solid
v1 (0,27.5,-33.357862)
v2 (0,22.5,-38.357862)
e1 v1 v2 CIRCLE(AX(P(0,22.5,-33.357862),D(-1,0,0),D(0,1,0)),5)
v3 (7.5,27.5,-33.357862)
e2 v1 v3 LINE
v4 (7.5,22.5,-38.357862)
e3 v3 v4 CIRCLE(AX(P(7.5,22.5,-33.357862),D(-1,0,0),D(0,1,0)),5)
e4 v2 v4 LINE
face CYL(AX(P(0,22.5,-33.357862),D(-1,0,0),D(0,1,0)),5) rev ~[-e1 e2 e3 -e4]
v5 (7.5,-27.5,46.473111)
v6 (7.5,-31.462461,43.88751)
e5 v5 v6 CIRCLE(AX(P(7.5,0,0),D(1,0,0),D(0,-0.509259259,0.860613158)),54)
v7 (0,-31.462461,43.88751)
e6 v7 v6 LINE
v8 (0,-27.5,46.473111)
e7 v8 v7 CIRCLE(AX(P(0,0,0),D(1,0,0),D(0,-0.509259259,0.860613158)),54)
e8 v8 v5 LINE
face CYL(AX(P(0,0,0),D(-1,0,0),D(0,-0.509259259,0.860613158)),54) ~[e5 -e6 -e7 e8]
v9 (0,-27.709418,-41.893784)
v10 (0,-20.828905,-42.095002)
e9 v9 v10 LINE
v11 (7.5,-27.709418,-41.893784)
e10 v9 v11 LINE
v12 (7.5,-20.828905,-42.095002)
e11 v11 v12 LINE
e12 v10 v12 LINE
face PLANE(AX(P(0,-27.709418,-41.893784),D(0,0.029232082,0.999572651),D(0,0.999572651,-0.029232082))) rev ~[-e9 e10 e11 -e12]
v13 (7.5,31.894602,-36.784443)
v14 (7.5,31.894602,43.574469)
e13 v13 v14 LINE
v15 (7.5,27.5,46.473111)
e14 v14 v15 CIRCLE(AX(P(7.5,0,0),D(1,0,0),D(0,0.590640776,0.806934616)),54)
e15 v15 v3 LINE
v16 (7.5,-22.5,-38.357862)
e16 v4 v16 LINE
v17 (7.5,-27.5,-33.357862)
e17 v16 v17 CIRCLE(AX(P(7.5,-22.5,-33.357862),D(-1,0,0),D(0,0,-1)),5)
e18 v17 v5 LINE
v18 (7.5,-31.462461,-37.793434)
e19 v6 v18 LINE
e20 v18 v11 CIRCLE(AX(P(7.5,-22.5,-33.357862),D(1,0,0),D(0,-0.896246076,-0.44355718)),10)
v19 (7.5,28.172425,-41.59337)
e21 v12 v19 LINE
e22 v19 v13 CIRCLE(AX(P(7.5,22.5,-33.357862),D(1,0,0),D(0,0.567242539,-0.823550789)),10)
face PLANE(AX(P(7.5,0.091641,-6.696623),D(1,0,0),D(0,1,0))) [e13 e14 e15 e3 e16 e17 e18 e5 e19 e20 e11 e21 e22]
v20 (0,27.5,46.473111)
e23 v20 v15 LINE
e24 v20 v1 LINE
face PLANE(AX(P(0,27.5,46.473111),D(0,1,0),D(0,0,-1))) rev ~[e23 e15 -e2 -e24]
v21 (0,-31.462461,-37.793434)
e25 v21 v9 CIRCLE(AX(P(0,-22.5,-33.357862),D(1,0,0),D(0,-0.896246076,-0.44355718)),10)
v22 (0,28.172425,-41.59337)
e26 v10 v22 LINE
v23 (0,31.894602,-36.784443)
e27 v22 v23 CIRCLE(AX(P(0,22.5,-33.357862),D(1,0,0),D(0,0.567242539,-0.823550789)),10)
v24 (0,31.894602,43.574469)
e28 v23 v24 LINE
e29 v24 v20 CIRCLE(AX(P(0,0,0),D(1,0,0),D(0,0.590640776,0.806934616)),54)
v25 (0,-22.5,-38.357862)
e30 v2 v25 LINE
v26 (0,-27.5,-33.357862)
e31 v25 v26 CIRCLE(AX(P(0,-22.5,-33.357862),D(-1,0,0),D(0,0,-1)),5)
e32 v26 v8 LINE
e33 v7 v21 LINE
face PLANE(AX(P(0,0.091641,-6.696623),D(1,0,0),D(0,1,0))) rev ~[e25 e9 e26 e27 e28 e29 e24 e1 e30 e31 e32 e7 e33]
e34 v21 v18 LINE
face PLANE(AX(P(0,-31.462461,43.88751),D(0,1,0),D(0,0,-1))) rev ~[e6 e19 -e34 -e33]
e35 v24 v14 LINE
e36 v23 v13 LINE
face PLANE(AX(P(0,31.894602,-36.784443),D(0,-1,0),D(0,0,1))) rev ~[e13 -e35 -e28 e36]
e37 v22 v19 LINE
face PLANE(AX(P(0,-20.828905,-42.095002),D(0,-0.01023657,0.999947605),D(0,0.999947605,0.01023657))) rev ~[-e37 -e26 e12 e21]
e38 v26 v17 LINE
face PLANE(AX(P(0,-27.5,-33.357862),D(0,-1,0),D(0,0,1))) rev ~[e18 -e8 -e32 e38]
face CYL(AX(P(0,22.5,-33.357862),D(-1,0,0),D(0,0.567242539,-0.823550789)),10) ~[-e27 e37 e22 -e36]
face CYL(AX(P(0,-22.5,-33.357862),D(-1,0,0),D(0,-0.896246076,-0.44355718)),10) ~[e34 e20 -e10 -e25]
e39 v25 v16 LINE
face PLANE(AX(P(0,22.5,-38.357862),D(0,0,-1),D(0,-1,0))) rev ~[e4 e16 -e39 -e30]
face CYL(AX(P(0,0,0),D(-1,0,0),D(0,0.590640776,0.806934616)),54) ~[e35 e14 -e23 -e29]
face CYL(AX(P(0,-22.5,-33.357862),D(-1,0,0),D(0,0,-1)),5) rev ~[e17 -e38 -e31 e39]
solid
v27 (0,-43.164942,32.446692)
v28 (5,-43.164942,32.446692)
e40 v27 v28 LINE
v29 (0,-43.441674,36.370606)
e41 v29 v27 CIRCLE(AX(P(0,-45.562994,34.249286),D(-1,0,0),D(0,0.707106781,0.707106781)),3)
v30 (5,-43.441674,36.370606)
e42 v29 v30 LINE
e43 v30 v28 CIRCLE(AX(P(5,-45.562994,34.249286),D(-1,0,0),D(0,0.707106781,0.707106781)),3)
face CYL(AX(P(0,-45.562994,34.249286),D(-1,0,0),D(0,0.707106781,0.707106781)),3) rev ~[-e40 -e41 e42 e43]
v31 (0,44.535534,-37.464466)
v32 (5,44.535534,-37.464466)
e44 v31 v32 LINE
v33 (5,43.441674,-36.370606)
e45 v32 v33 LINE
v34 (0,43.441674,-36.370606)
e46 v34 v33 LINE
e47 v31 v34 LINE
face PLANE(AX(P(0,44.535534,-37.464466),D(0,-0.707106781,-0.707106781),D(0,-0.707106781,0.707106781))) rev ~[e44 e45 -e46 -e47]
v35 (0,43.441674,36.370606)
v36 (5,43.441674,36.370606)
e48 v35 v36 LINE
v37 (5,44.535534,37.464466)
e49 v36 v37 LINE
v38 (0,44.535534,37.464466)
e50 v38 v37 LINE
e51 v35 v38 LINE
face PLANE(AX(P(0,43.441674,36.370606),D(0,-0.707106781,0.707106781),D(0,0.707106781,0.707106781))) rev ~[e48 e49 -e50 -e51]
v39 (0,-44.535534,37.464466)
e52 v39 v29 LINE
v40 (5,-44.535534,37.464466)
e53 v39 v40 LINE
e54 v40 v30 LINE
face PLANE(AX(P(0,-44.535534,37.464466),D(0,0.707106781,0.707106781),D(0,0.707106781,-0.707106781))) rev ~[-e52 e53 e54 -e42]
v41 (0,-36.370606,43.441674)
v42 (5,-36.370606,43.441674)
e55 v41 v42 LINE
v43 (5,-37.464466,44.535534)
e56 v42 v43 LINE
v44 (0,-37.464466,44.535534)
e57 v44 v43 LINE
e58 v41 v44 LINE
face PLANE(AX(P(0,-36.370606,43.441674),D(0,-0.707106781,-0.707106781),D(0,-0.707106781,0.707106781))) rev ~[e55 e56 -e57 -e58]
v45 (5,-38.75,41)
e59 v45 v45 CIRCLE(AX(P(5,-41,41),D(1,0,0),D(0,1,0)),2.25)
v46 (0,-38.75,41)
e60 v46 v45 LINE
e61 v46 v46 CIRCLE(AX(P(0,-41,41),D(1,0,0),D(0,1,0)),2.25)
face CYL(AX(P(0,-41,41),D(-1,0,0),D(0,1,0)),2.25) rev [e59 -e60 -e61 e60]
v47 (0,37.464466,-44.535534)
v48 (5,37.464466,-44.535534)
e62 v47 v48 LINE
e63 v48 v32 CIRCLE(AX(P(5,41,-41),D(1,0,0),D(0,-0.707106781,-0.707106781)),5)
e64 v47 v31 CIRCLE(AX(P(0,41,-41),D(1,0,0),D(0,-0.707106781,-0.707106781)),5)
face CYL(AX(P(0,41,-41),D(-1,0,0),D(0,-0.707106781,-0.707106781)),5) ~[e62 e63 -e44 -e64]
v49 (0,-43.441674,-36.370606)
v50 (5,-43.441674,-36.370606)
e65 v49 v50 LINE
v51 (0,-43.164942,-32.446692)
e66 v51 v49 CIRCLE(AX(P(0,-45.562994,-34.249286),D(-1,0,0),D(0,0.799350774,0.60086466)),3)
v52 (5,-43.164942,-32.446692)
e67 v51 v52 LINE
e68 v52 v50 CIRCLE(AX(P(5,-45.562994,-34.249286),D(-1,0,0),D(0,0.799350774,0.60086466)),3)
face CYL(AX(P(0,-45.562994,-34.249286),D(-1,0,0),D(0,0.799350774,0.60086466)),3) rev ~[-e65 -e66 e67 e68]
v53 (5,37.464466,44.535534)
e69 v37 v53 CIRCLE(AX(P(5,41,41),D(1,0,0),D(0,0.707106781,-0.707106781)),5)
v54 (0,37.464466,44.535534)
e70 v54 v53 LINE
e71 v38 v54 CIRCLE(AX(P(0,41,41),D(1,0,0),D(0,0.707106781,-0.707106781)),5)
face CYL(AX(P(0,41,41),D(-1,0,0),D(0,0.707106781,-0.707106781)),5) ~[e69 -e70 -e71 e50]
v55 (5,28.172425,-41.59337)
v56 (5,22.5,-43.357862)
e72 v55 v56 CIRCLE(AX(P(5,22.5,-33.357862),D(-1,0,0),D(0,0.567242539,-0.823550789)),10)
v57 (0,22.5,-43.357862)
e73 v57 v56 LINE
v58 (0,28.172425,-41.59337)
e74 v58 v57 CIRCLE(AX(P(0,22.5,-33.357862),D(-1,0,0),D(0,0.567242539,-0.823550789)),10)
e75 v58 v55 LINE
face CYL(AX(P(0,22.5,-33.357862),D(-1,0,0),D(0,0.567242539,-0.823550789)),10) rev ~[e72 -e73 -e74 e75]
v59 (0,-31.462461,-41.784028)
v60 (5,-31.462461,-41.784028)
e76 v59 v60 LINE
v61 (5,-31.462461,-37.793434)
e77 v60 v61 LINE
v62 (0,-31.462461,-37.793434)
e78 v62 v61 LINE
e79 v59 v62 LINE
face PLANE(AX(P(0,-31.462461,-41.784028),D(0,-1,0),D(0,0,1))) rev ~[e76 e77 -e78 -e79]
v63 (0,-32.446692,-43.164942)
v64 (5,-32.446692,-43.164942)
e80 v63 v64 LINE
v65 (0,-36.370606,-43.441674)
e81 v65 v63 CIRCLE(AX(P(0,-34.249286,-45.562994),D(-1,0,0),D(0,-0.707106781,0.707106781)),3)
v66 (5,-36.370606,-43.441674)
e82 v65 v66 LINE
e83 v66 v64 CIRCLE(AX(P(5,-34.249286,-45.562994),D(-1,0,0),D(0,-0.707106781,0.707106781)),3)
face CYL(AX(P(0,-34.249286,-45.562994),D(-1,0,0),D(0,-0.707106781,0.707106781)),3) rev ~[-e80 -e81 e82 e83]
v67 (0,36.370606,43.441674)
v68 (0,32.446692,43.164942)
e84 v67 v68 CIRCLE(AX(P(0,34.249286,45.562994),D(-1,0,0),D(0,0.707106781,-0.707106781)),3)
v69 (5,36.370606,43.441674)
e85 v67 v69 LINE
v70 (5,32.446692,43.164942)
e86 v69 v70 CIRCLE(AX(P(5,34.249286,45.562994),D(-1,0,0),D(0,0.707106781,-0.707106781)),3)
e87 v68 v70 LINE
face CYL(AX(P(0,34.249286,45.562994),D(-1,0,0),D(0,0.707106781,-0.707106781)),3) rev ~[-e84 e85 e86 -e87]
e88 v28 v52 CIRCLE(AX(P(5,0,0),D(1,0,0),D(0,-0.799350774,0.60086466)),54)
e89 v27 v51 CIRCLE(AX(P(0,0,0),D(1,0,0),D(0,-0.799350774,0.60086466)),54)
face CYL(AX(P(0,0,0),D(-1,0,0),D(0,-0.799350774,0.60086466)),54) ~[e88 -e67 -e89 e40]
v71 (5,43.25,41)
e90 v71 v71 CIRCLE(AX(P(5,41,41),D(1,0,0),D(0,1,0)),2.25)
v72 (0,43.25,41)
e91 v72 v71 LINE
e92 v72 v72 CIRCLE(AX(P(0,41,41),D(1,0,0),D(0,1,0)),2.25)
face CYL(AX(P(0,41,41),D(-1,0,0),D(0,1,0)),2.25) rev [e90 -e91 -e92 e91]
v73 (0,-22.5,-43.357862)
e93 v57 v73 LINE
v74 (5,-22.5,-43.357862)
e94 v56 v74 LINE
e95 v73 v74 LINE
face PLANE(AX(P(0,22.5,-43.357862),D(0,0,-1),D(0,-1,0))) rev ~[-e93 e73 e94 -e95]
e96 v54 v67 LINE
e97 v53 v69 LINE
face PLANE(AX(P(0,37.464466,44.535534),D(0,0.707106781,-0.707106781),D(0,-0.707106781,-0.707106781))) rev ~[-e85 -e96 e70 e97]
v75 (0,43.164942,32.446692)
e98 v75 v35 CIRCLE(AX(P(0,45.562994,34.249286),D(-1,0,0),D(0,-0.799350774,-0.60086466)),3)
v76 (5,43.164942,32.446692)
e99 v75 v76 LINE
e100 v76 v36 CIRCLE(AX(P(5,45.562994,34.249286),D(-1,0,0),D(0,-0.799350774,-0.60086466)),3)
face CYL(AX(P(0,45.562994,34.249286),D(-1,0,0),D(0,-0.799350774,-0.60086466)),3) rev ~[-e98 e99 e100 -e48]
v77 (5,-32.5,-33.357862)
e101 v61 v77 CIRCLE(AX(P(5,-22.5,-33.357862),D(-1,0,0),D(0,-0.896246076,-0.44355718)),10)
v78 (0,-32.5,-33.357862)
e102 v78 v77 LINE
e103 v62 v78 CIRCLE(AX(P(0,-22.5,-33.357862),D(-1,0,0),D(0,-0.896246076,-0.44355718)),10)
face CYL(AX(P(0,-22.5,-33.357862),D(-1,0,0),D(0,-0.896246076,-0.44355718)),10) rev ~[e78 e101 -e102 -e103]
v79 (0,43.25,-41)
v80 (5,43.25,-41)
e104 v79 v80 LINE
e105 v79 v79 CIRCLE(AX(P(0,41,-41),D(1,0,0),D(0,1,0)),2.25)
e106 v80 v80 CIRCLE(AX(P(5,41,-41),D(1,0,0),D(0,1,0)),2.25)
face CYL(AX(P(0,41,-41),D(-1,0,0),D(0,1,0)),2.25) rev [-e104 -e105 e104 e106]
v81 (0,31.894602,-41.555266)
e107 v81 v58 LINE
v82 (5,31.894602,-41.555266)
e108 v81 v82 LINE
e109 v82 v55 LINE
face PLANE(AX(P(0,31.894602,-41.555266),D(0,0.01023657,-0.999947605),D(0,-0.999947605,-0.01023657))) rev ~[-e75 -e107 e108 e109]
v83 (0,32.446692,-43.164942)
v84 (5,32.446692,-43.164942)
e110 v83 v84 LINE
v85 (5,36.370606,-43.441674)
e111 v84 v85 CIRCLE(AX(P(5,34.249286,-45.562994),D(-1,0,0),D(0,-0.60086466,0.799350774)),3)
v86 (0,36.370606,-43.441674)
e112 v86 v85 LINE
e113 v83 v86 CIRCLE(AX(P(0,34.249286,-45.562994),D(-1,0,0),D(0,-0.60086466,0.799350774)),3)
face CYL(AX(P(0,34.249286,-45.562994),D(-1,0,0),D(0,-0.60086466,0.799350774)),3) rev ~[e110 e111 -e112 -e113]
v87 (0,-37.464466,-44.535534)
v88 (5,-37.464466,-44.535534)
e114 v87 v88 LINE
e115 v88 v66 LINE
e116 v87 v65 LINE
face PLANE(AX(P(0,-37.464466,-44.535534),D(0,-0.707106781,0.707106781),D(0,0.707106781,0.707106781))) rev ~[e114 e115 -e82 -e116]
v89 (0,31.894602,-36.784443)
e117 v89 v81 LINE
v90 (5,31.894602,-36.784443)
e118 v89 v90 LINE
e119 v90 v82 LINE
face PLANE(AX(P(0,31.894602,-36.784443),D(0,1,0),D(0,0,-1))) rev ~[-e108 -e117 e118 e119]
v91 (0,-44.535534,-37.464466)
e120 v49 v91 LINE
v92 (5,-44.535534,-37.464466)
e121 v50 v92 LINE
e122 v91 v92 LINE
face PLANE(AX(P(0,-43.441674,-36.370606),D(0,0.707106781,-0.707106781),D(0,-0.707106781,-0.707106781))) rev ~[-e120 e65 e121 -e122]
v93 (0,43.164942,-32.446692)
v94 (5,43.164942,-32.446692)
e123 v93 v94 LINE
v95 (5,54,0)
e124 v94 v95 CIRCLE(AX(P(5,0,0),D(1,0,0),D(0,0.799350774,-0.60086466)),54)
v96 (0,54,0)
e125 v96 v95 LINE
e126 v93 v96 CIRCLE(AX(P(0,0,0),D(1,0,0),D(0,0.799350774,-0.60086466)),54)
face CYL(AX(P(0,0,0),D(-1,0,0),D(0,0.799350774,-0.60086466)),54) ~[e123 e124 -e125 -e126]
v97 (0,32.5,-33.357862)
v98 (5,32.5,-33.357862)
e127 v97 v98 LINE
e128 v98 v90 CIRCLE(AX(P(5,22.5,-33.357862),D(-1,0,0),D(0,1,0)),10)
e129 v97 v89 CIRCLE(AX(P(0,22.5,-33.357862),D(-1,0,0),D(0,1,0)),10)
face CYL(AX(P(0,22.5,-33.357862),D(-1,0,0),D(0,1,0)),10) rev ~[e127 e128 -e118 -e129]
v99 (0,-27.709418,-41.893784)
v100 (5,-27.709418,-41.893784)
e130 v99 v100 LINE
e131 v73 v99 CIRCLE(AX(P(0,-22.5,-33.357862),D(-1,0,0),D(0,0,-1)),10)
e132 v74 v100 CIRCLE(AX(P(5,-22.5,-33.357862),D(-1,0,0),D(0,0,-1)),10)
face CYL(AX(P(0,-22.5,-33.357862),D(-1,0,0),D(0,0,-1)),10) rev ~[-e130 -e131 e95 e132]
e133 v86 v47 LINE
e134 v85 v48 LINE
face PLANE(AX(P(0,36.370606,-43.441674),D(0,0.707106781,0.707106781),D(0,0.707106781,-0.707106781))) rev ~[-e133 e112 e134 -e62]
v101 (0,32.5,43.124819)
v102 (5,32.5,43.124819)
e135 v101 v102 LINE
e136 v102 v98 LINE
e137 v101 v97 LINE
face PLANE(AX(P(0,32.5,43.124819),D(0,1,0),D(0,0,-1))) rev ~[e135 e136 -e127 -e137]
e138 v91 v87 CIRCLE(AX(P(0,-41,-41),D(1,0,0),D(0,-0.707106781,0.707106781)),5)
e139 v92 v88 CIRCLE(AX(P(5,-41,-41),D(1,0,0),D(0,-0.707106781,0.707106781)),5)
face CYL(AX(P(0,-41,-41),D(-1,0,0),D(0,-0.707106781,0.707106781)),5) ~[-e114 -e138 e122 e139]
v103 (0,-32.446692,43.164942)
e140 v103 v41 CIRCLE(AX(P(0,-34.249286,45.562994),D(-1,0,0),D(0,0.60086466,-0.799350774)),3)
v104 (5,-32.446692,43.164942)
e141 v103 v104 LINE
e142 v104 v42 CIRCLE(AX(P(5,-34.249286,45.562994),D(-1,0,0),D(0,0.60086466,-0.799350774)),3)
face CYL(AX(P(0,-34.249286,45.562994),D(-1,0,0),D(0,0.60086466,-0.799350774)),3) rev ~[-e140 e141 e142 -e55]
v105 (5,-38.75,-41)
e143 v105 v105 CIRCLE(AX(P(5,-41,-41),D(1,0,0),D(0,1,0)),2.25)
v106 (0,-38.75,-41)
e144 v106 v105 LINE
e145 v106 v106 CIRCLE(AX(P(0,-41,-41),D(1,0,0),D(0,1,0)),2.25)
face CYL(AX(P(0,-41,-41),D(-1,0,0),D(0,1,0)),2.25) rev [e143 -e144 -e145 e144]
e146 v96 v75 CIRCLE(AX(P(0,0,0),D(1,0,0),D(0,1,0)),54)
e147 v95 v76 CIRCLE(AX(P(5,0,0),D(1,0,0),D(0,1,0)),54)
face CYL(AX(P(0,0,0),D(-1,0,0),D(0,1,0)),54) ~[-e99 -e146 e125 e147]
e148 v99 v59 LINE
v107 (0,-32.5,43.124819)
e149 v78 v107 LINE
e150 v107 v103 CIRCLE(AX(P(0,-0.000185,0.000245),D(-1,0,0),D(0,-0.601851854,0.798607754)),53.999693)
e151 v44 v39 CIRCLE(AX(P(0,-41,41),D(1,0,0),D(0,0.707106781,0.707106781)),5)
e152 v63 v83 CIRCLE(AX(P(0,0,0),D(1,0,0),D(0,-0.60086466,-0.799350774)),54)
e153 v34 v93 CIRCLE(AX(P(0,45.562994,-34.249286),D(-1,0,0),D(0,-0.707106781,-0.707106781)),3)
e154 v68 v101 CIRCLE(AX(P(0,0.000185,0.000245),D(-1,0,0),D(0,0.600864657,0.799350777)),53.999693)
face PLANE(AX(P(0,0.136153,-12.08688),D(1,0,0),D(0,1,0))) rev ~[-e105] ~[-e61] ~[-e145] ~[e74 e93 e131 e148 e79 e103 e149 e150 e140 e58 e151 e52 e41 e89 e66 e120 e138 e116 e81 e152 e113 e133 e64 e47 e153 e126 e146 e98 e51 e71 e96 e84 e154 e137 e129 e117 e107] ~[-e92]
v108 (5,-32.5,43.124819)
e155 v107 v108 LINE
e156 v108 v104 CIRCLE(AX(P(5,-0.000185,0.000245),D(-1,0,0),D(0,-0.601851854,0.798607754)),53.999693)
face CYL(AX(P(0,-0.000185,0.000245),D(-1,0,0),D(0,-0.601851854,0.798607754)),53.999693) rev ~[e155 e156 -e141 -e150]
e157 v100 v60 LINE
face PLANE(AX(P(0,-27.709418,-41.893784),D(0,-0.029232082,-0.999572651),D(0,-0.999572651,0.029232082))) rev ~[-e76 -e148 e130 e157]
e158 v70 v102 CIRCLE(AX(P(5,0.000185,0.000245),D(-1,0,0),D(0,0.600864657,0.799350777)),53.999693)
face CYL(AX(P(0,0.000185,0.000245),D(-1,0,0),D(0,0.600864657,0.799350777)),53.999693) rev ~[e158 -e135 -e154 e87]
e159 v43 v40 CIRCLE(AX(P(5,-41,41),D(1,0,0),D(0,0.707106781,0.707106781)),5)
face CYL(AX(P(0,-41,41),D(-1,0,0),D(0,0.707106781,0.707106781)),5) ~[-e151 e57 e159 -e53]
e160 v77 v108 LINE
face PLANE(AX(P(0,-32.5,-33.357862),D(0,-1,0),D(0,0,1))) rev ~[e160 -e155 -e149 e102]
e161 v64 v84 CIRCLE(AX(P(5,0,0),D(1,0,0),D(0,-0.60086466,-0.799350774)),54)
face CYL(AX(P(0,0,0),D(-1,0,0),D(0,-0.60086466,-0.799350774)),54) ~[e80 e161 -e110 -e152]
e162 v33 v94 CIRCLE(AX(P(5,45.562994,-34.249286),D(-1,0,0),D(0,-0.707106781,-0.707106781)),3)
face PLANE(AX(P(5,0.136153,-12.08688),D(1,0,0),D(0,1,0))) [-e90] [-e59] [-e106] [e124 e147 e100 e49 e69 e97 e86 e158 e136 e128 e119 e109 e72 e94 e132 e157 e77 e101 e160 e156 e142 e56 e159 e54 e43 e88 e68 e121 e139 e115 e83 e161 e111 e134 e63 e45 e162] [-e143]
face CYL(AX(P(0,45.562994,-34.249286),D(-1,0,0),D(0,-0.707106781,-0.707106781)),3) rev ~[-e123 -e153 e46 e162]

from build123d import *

# Parameters (mm, degrees)
F0_R     = 2.25
F1_DEPTH = 5
F2_DEPTH = 7.5


# Not quite as in the source:
# - a feature of the source that left no trace in its solid (it failed there, or was rolled back) is left out


with BuildPart() as f1:
    # F0 (on Right) → F1 (new body)
    with BuildSketch(Plane.YZ):
        with BuildLine():
            Line((-32.5, -33.3578620553), (-32.5, 43.1248188402))
            ThreePointArc((-32.5, 43.1248188402), (-38.2073481766, 38.1601696185), (-43.1649418054, 32.4466916485))
            ThreePointArc((-43.1649418054, 32.4466916485), (-54, 0), (-43.1649418054, -32.4466916485))
            ThreePointArc((-43.1649418054, -32.4466916485), (-38.1837661841, -38.1837661841), (-32.4466916485, -43.1649418054))
            ThreePointArc((-32.4466916485, -43.1649418054), (0, -54), (32.4466916485, -43.1649418054))
            ThreePointArc((32.4466916485, -43.1649418054), (38.1837661841, -38.1837661841), (43.1649418054, -32.4466916485))
            ThreePointArc((43.1649418054, -32.4466916485), (51.2196586161, -17.1039928453), (54, 0))
            ThreePointArc((54, 0), (51.2196586161, 17.1039928453), (43.1649418054, 32.4466916485))
            ThreePointArc((43.1649418054, 32.4466916485), (38.2073481766, 38.1601696185), (32.5, 43.1248188402))
            Line((32.5, 43.1248188402), (32.5, -33.3578620553))
            ThreePointArc((32.5, -33.3578620553), (32.3474874667, -35.0976869294), (31.8946018815, -36.7844427837))
            Line((31.8946018815, -36.7844427837), (31.8946018815, -41.5552656251))
            Line((31.8946018815, -41.5552656251), (28.1724253923, -41.593369943))
            ThreePointArc((28.1724253923, -41.593369943), (25.4702627091, -42.9065551302), (22.5, -43.3578620553))
            Line((22.5, -43.3578620553), (-22.5, -43.3578620553))
            ThreePointArc((-22.5, -43.3578620553), (-25.2056219122, -42.9848870406), (-27.70941795, -41.8937840689))
            Line((-27.70941795, -41.8937840689), (-31.4624607563, -41.7840279114))
            Line((-31.4624607563, -41.7840279114), (-31.4624607563, -37.7934338552))
            ThreePointArc((-31.4624607563, -37.7934338552), (-32.2371609713, -35.6355135252), (-32.5, -33.3578620553))
        make_face()
        with BuildLine():
            ThreePointArc((-32.5, 43.1248188402), (-32.4733520211, 43.1448885561), (-32.4466916485, 43.1649418054))
            ThreePointArc((-32.4466916485, 43.1649418054), (-34.4603348429, 42.5704269643), (-36.3706059725, 43.4416737844))
            Line((-36.3706059725, 43.4416737844), (-37.4644660941, 44.5355339059))
            ThreePointArc((-37.4644660941, 44.5355339059), (-44.5355339059, 44.5355339059), (-44.5355339059, 37.4644660941))
            Line((-44.5355339059, 37.4644660941), (-43.4416737844, 36.3706059725))
            ThreePointArc((-43.4416737844, 36.3706059725), (-42.5704269643, 34.4603348429), (-43.1649418054, 32.4466916485))
            ThreePointArc((-43.1649418054, 32.4466916485), (-38.2073481766, 38.1601696185), (-32.5, 43.1248188402))
        make_face()
        with Locations((-41, 41)):
            Circle(F0_R, mode=Mode.SUBTRACT)
        with BuildLine():
            ThreePointArc((32.5, 43.1248188402), (38.2073481766, 38.1601696185), (43.1649418054, 32.4466916485))
            ThreePointArc((43.1649418054, 32.4466916485), (42.5704269643, 34.4603348429), (43.4416737844, 36.3706059725))
            Line((43.4416737844, 36.3706059725), (44.5355339059, 37.4644660941))
            ThreePointArc((44.5355339059, 37.4644660941), (44.5355339059, 44.5355339059), (37.4644660941, 44.5355339059))
            Line((37.4644660941, 44.5355339059), (36.3706059725, 43.4416737844))
            ThreePointArc((36.3706059725, 43.4416737844), (34.4603348429, 42.5704269643), (32.4466916485, 43.1649418054))
            ThreePointArc((32.4466916485, 43.1649418054), (32.4733520211, 43.1448885561), (32.5, 43.1248188402))
        make_face()
        with Locations((41, 41)):
            Circle(F0_R, mode=Mode.SUBTRACT)
        with BuildLine():
            ThreePointArc((43.1649418054, -32.4466916485), (38.1837661841, -38.1837661841), (32.4466916485, -43.1649418054))
            ThreePointArc((32.4466916485, -43.1649418054), (34.4603348429, -42.5704269643), (36.3706059725, -43.4416737844))
            Line((36.3706059725, -43.4416737844), (37.4644660941, -44.5355339059))
            ThreePointArc((37.4644660941, -44.5355339059), (44.5355339059, -44.5355339059), (44.5355339059, -37.4644660941))
            Line((44.5355339059, -37.4644660941), (43.4416737844, -36.3706059725))
            ThreePointArc((43.4416737844, -36.3706059725), (42.5704269643, -34.4603348429), (43.1649418054, -32.4466916485))
        make_face()
        with Locations((41, -41)):
            Circle(F0_R, mode=Mode.SUBTRACT)
        with BuildLine():
            ThreePointArc((-32.4466916485, -43.1649418054), (-38.1837661841, -38.1837661841), (-43.1649418054, -32.4466916485))
            ThreePointArc((-43.1649418054, -32.4466916485), (-42.5704269643, -34.4603348429), (-43.4416737844, -36.3706059725))
            Line((-43.4416737844, -36.3706059725), (-44.5355339059, -37.4644660941))
            ThreePointArc((-44.5355339059, -37.4644660941), (-44.5355339059, -44.5355339059), (-37.4644660941, -44.5355339059))
            Line((-37.4644660941, -44.5355339059), (-36.3706059725, -43.4416737844))
            ThreePointArc((-36.3706059725, -43.4416737844), (-34.4603348429, -42.5704269643), (-32.4466916485, -43.1649418054))
        make_face()
        with Locations((-41, -41)):
            Circle(F0_R, mode=Mode.SUBTRACT)
    extrude(amount=F1_DEPTH)


with BuildPart() as f2:
    # F0 (on Right) → F2 (new body)
    with BuildSketch(Plane.YZ):
        with BuildLine():
            ThreePointArc((-27.5, 46.4731105049), (-29.5095624616, 45.2237296486), (-31.4624607563, 43.8875103322))
            Line((-31.4624607563, 43.8875103322), (-31.4624607563, -33.3578620553))
            Line((-31.4624607563, -33.3578620553), (-31.4624607563, -37.7934338552))
            ThreePointArc((-31.4624607563, -37.7934338552), (-29.876567934, -40.1096207532), (-27.70941795, -41.8937840689))
            Line((-27.70941795, -41.8937840689), (-20.8289045841, -42.0950017869))
            Line((-20.8289045841, -42.0950017869), (28.1724253923, -41.593369943))
            ThreePointArc((28.1724253923, -41.593369943), (30.407924685, -39.4787057207), (31.8946018815, -36.7844427837))
            Line((31.8946018815, -36.7844427837), (31.8946018815, -33.3578620553))
            Line((31.8946018815, -33.3578620553), (31.8946018815, 43.5744692546))
            ThreePointArc((31.8946018815, 43.5744692546), (29.7326455843, 45.0773755509), (27.5, 46.4731105049))
            Line((27.5, 46.4731105049), (27.5, -33.3578620553))
            ThreePointArc((27.5, -33.3578620553), (26.0355339059, -36.8933959612), (22.5, -38.3578620553))
            Line((22.5, -38.3578620553), (-22.5, -38.3578620553))
            ThreePointArc((-22.5, -38.3578620553), (-26.0355339059, -36.8933959612), (-27.5, -33.3578620553))
            Line((-27.5, -33.3578620553), (-27.5, 46.4731105049))
        make_face()
    extrude(amount=F2_DEPTH)


solid = Compound([f1.part, f2.part])
